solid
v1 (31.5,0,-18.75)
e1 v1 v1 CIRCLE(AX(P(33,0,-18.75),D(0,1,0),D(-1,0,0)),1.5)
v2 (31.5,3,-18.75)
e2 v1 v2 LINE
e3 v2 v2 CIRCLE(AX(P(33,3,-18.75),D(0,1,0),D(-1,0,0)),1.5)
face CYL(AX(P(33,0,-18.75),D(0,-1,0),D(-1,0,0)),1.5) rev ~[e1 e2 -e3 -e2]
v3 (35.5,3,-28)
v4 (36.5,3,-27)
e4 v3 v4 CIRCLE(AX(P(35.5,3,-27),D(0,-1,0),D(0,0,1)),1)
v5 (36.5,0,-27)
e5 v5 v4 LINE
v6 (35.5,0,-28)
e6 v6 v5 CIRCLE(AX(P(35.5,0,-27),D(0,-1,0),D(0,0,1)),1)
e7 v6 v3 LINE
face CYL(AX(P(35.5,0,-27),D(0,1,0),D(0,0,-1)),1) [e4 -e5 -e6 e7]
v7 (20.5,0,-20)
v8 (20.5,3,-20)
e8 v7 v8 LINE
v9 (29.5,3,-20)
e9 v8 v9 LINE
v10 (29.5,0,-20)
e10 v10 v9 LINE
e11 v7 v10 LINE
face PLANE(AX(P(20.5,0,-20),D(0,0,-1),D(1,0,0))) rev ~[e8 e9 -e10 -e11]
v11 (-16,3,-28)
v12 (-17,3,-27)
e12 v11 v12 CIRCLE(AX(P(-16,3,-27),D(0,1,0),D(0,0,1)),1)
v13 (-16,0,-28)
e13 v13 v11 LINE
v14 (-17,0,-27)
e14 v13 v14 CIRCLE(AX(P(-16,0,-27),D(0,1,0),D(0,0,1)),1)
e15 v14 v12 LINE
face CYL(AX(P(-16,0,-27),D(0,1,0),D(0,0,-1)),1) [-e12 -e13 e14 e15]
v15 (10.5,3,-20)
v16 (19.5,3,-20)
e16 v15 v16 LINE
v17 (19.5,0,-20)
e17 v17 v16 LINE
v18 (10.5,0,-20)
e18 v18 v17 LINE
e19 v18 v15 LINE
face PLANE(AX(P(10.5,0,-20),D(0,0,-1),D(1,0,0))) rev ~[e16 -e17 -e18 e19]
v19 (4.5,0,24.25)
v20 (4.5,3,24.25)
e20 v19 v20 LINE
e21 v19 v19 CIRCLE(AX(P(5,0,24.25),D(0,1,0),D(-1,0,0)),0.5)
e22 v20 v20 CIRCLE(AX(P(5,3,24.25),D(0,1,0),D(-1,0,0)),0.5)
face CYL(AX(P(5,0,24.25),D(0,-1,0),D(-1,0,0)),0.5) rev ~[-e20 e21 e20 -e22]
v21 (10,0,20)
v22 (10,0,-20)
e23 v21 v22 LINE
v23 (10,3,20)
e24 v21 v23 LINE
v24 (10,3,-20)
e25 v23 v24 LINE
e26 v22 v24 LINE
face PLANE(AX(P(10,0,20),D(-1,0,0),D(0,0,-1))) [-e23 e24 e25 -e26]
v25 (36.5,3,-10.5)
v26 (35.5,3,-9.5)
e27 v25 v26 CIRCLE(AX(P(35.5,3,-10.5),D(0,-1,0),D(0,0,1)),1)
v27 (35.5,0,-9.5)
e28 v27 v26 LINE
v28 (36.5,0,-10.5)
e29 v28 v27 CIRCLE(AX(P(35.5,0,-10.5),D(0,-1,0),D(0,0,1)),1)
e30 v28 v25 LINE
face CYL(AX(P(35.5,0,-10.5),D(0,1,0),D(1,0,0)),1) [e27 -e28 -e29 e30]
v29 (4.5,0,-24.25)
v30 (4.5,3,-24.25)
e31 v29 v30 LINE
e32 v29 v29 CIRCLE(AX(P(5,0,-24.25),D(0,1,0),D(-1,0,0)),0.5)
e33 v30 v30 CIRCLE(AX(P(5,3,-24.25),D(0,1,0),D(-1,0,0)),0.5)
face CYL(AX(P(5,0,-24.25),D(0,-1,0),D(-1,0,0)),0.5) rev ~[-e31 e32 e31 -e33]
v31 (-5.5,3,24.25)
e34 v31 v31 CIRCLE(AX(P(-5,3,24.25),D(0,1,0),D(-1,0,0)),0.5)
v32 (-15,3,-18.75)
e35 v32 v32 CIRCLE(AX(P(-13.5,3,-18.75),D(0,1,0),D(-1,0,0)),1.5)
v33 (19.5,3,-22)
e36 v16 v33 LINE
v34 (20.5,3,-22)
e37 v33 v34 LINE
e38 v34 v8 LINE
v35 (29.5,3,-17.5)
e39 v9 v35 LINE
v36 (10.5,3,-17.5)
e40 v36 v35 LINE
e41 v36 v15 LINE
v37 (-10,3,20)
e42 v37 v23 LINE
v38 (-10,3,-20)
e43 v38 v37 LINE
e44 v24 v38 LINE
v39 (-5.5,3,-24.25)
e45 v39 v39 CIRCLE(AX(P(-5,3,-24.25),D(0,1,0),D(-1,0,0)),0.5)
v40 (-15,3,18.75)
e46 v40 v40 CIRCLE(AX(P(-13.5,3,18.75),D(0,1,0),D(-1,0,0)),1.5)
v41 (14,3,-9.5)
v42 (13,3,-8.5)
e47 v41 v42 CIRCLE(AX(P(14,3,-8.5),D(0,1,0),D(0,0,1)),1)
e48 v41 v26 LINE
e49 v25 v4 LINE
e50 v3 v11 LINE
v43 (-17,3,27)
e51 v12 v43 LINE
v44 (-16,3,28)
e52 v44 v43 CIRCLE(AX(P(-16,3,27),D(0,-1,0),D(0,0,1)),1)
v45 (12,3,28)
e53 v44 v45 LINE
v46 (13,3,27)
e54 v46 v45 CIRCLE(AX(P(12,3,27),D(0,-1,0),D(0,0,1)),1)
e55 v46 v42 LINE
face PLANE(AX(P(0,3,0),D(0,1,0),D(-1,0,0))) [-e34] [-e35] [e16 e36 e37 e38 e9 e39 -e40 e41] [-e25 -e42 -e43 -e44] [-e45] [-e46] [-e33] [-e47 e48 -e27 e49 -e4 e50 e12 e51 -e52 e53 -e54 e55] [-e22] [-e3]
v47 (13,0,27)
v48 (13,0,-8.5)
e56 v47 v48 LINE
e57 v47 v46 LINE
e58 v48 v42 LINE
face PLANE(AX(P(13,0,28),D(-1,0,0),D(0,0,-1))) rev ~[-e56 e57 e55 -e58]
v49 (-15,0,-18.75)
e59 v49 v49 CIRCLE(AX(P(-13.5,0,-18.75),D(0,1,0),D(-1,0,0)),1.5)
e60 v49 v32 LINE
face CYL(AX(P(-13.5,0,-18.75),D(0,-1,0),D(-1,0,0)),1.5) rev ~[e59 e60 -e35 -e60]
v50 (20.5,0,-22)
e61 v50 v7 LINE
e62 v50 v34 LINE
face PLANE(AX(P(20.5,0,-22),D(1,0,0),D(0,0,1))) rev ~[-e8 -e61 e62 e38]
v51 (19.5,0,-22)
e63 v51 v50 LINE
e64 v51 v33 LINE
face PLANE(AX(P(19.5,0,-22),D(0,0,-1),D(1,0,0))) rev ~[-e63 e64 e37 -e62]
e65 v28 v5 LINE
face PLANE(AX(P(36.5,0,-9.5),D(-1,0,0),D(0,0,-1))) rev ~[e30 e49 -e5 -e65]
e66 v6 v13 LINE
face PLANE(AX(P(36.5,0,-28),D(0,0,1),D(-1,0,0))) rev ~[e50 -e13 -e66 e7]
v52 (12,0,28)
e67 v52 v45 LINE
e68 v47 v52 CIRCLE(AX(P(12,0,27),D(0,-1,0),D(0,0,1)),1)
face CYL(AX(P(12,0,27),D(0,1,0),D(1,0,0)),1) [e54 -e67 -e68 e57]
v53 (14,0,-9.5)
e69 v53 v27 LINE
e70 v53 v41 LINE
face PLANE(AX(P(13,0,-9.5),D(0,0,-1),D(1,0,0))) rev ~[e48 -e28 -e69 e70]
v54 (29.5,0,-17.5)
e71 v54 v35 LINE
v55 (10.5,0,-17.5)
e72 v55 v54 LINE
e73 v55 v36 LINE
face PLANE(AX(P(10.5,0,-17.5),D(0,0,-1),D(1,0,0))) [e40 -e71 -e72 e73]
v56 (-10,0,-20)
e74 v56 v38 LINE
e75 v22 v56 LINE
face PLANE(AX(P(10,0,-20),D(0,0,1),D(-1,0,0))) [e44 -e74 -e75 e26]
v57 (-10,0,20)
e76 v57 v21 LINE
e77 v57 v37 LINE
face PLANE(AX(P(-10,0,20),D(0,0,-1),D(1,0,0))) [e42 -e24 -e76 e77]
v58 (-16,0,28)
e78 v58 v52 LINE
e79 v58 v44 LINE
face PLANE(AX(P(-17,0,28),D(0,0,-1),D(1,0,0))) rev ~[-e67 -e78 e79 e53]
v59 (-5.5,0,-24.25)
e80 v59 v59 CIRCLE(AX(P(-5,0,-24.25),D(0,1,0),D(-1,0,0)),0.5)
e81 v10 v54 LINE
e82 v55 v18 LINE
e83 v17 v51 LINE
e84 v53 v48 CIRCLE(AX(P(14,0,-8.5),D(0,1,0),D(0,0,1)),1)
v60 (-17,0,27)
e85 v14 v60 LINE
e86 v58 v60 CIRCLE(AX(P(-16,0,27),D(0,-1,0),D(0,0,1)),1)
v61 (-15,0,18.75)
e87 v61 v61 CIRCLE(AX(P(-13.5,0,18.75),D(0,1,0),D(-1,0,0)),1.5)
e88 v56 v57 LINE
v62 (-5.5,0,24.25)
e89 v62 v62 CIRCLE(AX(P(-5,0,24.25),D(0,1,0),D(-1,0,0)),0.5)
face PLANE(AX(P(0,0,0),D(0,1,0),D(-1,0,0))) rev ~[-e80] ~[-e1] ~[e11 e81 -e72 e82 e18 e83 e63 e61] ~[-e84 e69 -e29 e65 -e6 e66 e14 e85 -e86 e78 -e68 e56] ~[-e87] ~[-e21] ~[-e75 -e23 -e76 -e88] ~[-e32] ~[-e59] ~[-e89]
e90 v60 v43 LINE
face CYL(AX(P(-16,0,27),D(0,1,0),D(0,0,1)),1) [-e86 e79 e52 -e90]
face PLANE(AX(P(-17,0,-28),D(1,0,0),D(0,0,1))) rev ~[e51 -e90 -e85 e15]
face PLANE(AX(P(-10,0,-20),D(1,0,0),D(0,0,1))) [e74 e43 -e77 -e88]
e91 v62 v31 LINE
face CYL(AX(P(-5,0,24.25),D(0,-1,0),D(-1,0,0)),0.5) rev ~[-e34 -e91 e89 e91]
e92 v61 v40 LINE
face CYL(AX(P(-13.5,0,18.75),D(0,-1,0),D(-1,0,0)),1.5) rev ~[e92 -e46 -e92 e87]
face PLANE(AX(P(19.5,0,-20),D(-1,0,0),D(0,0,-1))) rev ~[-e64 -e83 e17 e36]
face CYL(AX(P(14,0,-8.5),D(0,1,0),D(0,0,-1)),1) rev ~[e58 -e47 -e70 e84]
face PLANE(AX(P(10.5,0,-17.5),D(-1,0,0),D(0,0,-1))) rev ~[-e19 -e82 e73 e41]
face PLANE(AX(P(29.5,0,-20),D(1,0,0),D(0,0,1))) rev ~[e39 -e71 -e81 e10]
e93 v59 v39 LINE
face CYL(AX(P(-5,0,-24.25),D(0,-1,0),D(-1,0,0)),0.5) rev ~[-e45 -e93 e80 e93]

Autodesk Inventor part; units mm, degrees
ref_plane "YZ Plane" through (0, 0, 0) normal (1, 0, 0) x (0, 1, 0)
ref_plane "XZ Plane" through (0, 0, 0) normal (0, 1, 0) x (-1, 0, 0)
ref_plane "XY Plane" through (0, 0, 0) normal (0, 0, 1) x (1, 0, 0)
sketch "Sketch1" plane through (0, 0, 0) normal (0, 1, 0) x (-1, 0, 0)
  line L0 (46, 0) -> (-35, 0) construction
  line L1 (0, 54) -> (0, -60) construction
  line L2 (10, 20) -> (-10, 20)
  line L3 (-10, 20) -> (-10, -20)
  line L4 (-10, -20) -> (10, -20)
  line L5 (10, -20) -> (10, 20)
  line L6 (17, -28) -> (17, 28)
  line L7 (17, 28) -> (-13, 28)
  line L8 (-13, 28) -> (-13, -9.5)
  line L9 (-13, -9.5) -> (-36.5, -9.5)
  line L10 (-36.5, -9.5) -> (-36.5, -28)
  line L11 (-36.5, -28) -> (17, -28)
  line L12 (-29.5, -20) -> (-29.5, -17.5)
  line L13 (-10.5, -17.5) -> (-10.5, -20)
  circle A0 centre (5, 24.25) radius 0.5
  circle A1 centre (-5, 24.25) radius 0.5
  line L14 (14.6784, 24.25) -> (-18, 24.25) construction
  circle A2 centre (5, -24.25) radius 0.5
  circle A3 centre (-5, -24.25) radius 0.5
  circle A4 centre (13.5, -18.75) radius 1.5
  circle A5 centre (13.5, 18.75) radius 1.5
  circle A6 centre (-33, -18.75) radius 1.5
  line L15 (-20, 4) -> (-20, -26.5) construction
  line L16 (-10.5, -20) -> (-19.5, -20)
  line L17 (-19.5, -20) -> (-19.5, -22)
  line L18 (-19.5, -22) -> (-20.5, -22)
  line L19 (-20.5, -22) -> (-20.5, -20)
  line L20 (-20.5, -20) -> (-29.5, -20)
  line L21 (-10.5, -17.5) -> (-29.5, -17.5)
  point P0 (0, 0)
  point P1 (-20.5, -17.5)
  dimension "d0" = 40
  dimension "d1" = 20
  dimension "d2" = 7
  dimension "d3" = 8
  dimension "d4" = 8
  dimension "d5" = 3
  dimension "d6" = 20
  dimension "d7" = 10
  dimension "d8" = 19
  dimension "d9" = 2.5
  dimension "d10" = 0.5
  dimension "d11" = 1
  dimension "d12" = 1
  dimension "d13" = 5
  dimension "d14" = 5
  dimension "d15" = 4.25
  dimension "d16" = 3
  dimension "d17" = 9.25
  dimension "d19" = 18.5
  dimension "d20" = 7
  dimension "d21" = 3
  dimension "d23" = 9.25
  dimension "d29" = 3.5
  dimension "d30" = 3.5
  dimension "d31" = 2
  dimension "d32" = 1
extrude "Extrusion1" add sketch "Sketch1" along normal blind 3
fillet "Fillet1" radius 1 6 edges at (-17, 1.5, 28) (13, 1.5, 28) (13, 1.5, -9.5) (36.5, 1.5, -9.5) (36.5, 1.5, -28) (-17, 1.5, -28)
properties part number "BracketCoxa"
